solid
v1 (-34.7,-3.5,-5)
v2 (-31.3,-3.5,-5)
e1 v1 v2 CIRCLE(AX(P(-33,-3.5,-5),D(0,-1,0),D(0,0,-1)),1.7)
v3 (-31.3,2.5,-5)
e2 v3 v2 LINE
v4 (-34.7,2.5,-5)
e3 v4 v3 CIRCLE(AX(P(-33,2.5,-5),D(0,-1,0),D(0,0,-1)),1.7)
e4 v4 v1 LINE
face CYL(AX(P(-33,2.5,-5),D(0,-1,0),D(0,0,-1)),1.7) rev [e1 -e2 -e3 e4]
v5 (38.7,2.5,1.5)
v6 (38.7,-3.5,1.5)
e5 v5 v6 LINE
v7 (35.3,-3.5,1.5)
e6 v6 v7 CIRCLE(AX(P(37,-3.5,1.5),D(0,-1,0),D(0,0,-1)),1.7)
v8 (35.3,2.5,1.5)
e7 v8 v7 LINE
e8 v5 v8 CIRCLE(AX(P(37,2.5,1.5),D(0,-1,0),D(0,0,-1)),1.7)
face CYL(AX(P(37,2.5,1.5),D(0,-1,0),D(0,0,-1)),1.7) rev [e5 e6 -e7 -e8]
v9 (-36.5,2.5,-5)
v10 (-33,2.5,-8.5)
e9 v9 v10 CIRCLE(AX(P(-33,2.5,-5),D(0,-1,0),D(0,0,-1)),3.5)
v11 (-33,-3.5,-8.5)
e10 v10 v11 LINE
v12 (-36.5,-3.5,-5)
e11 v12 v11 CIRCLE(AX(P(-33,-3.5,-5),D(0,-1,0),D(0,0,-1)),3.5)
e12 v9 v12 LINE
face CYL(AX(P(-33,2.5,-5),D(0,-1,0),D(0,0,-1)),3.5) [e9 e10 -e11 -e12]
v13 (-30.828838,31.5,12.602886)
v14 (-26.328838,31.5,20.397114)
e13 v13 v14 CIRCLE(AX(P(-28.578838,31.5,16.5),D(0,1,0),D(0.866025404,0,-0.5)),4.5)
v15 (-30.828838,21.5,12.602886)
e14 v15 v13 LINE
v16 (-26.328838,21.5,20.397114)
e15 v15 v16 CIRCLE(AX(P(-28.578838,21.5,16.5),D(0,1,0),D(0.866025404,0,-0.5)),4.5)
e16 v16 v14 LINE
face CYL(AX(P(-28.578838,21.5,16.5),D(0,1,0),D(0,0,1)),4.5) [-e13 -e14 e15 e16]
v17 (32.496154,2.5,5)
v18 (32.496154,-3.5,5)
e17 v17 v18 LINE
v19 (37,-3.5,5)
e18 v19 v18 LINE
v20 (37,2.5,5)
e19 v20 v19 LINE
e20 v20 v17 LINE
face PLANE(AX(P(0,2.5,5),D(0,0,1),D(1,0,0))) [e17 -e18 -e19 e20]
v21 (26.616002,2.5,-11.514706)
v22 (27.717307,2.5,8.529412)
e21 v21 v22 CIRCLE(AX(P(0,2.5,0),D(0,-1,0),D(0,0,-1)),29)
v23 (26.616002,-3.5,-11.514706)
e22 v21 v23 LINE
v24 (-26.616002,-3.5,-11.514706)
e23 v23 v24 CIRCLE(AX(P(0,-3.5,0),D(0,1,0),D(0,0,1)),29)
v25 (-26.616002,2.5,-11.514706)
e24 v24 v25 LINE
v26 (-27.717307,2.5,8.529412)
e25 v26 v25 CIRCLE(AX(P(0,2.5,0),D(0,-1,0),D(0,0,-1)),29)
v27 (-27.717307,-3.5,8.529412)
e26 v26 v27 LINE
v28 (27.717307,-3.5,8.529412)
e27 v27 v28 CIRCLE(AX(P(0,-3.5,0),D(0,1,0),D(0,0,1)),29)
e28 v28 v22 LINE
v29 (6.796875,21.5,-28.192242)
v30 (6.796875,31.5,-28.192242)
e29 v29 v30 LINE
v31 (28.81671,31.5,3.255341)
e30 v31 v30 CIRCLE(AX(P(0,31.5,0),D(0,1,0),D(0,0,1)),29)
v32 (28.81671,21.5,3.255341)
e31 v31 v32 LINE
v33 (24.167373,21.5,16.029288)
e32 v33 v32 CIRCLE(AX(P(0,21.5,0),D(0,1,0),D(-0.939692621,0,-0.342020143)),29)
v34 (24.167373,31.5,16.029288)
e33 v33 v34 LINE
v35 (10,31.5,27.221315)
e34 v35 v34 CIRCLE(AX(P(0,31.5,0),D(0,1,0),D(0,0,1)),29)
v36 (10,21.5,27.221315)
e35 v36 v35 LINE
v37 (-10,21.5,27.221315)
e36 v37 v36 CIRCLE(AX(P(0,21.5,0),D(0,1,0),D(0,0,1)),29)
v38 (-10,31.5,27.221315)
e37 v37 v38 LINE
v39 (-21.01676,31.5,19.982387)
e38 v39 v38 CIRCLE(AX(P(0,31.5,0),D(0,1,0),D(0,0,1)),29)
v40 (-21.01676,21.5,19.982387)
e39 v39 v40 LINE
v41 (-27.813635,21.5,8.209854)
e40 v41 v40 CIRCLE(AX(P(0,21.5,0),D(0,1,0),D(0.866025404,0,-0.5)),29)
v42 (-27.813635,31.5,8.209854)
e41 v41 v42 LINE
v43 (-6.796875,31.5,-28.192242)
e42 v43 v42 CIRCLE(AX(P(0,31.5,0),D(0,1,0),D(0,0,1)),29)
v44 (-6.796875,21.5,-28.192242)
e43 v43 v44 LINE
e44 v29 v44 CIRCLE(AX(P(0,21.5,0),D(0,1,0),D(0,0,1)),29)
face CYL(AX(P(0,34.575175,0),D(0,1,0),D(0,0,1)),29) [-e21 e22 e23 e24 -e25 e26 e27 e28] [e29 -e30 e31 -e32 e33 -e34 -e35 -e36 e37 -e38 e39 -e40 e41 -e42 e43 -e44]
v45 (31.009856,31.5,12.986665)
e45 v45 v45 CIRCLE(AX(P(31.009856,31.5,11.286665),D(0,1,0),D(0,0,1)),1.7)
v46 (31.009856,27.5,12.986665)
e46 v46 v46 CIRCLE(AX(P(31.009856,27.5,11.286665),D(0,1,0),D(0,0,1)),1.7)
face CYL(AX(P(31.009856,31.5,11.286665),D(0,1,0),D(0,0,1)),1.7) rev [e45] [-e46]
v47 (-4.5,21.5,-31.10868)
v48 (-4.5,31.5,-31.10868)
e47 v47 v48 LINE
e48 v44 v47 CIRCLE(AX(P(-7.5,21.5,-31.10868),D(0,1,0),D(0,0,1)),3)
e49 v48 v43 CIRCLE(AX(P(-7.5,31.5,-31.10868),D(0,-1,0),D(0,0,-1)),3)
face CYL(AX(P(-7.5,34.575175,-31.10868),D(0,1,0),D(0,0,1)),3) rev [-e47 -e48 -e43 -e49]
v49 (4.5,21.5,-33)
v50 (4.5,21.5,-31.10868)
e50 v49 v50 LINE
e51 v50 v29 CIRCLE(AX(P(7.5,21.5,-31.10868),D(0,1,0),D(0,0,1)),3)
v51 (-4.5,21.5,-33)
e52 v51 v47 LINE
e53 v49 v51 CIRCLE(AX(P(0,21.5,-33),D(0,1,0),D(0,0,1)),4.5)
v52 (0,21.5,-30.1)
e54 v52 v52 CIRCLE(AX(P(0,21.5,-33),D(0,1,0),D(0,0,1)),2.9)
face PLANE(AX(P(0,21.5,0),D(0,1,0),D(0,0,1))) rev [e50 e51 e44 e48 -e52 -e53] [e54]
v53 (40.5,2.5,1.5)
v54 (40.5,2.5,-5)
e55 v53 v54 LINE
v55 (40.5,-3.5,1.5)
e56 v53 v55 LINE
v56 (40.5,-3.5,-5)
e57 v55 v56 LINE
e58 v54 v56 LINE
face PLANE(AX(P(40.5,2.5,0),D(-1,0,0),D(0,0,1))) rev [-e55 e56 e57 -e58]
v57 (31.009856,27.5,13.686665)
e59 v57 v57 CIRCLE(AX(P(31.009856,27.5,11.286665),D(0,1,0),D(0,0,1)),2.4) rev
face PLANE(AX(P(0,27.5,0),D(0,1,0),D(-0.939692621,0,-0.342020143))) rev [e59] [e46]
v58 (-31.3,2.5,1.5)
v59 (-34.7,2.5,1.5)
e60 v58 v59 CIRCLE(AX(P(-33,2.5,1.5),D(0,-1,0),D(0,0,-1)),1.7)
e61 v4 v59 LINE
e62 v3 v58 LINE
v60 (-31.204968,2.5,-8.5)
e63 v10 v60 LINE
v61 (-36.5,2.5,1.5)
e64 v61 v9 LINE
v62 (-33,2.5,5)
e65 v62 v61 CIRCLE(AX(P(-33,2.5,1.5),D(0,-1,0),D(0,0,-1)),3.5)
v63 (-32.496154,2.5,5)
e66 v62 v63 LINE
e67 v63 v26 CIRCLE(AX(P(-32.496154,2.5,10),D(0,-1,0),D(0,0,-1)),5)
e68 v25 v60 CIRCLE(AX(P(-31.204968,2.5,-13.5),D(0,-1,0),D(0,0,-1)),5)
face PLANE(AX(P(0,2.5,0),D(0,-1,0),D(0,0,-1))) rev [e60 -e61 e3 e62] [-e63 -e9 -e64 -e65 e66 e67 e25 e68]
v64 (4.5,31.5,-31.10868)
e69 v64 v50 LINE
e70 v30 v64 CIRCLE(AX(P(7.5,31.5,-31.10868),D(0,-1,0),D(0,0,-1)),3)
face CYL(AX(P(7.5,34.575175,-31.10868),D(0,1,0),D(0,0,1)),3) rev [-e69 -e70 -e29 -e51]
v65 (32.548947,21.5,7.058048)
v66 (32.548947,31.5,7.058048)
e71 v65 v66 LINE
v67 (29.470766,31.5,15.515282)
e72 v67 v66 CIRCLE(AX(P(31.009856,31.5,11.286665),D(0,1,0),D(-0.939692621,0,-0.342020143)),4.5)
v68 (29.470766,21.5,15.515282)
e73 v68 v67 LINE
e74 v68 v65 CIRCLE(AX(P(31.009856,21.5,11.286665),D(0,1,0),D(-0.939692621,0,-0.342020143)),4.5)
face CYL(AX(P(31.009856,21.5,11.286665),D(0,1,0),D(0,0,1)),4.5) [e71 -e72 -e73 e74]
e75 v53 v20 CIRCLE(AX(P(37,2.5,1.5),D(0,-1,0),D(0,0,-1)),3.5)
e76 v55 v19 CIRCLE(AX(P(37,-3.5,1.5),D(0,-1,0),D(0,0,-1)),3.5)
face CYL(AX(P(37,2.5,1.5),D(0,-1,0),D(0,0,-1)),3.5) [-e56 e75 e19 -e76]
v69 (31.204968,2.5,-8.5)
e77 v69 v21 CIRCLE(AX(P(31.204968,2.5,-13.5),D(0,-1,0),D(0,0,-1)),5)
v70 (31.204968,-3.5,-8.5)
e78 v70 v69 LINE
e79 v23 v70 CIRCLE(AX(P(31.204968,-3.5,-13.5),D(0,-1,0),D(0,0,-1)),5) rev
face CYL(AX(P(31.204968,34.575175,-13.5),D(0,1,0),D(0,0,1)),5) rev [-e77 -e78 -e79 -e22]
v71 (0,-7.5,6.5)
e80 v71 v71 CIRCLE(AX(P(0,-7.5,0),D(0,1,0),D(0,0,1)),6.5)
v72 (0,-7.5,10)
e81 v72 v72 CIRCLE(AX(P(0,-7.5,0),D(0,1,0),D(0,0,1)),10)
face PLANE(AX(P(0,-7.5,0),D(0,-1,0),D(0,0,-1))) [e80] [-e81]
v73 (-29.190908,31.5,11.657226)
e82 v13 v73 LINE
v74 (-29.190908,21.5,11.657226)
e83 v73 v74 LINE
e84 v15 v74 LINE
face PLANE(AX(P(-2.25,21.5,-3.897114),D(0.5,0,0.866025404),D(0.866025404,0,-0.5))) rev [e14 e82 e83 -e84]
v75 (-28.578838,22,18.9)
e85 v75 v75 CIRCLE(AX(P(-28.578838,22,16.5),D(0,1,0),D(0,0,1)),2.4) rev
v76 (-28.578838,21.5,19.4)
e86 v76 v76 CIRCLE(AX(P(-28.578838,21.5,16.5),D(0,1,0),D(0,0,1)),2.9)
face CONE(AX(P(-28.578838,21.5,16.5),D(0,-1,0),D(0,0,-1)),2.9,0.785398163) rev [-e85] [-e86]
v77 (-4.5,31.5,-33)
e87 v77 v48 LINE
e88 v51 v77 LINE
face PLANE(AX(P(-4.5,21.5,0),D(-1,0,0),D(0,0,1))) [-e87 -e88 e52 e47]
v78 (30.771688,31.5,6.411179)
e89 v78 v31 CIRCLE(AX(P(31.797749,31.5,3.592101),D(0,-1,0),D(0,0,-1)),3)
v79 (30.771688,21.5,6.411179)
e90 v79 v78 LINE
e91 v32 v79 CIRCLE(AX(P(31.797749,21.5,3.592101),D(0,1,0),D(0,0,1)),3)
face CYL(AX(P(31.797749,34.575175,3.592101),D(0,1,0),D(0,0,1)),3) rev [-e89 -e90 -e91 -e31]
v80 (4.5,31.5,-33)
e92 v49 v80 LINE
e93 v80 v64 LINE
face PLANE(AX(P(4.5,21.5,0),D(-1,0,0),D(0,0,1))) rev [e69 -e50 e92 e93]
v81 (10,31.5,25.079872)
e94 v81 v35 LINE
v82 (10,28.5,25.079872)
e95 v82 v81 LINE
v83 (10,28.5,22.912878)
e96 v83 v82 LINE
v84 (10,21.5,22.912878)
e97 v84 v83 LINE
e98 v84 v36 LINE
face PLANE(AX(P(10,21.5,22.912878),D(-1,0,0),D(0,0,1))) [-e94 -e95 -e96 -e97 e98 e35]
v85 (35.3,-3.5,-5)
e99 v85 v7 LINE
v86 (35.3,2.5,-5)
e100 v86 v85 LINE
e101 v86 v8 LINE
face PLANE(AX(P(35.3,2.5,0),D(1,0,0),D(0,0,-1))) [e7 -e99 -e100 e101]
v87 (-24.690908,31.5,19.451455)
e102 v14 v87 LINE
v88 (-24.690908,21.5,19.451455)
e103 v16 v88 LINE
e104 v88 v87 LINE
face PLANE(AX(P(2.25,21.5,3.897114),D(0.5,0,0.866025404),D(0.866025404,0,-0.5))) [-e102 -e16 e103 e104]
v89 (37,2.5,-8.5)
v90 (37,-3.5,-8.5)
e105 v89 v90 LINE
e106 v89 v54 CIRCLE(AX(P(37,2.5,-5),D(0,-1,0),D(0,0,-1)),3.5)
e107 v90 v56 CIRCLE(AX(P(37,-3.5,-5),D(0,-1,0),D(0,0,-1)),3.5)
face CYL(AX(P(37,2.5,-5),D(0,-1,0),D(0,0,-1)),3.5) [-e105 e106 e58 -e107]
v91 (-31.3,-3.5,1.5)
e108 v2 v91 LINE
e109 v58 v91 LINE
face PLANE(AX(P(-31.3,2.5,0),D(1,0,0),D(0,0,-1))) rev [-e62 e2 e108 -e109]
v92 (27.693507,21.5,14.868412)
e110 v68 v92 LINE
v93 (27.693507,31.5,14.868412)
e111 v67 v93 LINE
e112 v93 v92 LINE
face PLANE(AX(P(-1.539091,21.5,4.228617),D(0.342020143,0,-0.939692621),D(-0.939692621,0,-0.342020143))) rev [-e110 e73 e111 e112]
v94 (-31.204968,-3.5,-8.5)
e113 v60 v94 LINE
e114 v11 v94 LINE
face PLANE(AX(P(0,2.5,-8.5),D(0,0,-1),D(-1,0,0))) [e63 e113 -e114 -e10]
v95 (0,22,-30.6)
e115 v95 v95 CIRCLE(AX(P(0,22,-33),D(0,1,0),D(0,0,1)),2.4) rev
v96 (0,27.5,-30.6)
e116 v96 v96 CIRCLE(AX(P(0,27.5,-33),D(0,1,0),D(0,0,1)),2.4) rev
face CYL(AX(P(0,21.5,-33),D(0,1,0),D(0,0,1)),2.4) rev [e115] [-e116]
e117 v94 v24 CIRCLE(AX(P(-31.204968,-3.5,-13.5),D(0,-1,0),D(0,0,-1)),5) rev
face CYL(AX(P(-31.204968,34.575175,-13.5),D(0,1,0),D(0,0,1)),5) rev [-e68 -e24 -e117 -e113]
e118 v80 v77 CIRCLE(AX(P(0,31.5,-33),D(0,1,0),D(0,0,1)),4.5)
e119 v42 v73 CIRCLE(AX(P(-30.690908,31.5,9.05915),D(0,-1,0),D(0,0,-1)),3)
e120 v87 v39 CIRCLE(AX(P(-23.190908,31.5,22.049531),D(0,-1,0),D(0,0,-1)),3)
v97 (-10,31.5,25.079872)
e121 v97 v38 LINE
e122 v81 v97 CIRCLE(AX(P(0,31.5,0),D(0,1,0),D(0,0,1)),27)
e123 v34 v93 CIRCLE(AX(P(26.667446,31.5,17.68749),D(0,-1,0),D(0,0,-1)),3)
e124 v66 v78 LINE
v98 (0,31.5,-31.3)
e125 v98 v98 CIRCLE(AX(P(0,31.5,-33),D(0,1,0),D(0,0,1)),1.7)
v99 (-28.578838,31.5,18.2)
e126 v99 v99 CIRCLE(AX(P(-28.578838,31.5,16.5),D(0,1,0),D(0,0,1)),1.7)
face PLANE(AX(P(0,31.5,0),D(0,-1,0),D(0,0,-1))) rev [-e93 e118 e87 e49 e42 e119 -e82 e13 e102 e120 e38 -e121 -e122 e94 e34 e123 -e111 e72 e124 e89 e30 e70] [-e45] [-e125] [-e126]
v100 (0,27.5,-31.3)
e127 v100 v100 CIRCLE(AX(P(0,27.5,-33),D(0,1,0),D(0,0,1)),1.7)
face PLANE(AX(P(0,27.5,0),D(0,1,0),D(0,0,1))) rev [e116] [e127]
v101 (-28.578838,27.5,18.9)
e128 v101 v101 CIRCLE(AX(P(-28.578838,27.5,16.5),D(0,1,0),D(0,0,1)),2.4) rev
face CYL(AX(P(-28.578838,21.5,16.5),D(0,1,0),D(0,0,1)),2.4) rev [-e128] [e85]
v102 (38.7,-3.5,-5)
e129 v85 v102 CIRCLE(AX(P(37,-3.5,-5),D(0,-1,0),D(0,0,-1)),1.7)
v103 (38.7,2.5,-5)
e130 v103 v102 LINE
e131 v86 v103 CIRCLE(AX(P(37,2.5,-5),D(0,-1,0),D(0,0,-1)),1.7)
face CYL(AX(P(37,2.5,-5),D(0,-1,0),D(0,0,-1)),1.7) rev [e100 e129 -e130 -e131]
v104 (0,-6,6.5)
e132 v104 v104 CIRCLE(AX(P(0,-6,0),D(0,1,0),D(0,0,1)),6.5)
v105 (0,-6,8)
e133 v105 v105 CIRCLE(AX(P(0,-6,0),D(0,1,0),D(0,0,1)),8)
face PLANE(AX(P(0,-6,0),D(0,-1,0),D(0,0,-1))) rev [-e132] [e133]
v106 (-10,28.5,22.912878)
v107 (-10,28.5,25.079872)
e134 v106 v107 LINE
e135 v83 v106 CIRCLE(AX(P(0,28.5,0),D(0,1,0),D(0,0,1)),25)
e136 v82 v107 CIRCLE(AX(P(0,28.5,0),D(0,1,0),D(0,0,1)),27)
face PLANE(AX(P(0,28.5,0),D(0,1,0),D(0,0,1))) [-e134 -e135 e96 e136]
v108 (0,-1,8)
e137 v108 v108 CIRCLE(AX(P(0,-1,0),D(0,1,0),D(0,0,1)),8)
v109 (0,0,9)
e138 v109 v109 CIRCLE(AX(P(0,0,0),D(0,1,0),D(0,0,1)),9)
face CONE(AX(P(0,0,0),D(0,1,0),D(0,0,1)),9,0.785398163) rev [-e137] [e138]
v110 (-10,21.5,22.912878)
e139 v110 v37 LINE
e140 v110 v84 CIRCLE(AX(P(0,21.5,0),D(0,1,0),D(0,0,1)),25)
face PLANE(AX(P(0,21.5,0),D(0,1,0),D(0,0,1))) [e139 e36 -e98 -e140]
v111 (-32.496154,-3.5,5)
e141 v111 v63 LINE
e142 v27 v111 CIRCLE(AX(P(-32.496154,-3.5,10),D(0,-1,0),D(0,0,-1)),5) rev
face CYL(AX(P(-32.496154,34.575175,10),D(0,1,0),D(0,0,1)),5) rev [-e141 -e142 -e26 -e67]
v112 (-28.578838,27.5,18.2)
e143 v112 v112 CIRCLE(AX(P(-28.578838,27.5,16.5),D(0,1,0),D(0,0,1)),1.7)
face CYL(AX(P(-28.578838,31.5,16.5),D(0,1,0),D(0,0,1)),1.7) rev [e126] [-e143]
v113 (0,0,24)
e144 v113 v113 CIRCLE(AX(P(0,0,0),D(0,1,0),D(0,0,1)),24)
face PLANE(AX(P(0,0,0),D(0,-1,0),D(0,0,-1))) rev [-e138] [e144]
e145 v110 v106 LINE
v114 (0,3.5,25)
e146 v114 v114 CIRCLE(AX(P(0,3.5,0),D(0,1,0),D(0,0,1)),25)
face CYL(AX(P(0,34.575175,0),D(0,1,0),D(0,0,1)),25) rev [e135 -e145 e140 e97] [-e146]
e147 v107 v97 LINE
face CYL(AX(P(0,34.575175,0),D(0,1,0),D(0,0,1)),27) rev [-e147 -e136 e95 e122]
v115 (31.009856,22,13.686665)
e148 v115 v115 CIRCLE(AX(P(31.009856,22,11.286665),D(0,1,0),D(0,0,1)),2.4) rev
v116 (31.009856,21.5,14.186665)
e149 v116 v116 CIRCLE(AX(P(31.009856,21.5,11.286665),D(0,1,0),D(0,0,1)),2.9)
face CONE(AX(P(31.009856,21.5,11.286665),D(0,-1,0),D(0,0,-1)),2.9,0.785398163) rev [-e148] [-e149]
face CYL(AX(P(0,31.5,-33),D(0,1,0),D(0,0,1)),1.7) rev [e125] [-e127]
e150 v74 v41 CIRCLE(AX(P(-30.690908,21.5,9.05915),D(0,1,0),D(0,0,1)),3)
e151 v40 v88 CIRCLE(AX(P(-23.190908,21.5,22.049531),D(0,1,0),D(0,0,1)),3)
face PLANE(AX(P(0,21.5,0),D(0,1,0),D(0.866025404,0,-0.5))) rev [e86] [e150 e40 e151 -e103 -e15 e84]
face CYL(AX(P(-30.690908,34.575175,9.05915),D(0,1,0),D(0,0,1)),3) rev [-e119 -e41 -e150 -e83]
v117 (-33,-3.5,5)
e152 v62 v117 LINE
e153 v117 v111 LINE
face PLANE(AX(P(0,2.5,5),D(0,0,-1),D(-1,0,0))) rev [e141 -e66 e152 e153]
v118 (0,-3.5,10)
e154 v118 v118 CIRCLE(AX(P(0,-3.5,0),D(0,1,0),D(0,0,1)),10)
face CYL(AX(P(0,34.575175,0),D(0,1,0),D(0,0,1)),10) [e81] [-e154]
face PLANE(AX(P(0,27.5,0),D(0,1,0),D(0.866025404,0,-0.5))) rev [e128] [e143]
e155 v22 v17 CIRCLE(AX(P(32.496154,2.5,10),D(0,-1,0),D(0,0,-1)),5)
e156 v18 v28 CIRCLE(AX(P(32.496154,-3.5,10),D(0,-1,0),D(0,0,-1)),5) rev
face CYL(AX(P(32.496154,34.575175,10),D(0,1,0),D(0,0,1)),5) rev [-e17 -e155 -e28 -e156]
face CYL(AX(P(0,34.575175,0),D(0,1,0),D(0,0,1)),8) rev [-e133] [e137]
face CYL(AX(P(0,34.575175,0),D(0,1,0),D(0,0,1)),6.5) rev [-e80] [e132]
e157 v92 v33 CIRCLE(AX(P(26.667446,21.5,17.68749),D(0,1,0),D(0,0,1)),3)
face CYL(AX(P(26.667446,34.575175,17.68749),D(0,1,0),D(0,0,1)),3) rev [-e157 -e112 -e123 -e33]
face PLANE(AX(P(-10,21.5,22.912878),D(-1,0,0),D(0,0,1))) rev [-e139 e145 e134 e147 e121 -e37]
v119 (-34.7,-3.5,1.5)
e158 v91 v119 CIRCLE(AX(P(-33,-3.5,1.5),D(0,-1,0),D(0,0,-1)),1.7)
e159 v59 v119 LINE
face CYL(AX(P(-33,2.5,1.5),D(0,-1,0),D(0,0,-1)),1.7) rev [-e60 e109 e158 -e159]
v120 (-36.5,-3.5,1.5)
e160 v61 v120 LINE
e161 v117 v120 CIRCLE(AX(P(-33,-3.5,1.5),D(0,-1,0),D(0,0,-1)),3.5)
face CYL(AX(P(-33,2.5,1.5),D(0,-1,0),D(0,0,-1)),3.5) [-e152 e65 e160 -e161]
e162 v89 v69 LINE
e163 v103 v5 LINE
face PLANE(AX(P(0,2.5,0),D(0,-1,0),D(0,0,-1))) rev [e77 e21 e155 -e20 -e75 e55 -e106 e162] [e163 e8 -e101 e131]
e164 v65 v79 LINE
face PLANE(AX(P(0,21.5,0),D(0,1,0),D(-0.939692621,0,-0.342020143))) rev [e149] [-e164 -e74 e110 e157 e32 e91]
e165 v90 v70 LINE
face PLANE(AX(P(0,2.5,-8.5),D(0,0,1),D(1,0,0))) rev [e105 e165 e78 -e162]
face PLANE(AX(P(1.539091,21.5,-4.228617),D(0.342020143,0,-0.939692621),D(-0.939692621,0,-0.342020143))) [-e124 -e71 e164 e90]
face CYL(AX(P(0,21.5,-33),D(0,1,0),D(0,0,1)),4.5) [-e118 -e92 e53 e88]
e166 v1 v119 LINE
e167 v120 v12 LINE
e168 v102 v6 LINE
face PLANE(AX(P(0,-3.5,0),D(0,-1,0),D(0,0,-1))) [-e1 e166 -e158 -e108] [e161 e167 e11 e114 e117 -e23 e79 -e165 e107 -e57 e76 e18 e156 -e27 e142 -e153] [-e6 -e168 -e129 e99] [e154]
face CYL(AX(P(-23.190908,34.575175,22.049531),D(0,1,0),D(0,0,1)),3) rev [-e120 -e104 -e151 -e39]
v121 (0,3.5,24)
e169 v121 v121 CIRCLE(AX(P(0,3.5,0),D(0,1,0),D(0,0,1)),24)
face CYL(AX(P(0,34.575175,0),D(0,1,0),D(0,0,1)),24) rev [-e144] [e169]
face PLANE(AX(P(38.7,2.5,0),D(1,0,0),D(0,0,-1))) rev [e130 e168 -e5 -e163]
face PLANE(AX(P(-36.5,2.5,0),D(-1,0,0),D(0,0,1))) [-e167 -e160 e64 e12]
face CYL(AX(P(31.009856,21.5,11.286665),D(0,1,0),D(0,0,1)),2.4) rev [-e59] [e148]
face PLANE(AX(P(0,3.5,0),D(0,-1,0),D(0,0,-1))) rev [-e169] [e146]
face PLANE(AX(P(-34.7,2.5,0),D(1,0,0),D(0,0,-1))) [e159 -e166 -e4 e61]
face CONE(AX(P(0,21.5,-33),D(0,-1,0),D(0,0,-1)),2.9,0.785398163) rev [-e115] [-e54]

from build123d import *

# Parameters (mm, degrees)
ESQUISSE1_R                        = 2.4
BOSS_EXTRU_1_DEPTH                 = 10
ESQUISSE1_3_R                      = 2.4
BOSS_EXTRU_2_DEPTH                 = 4
CHANFREIN2_SIZE                    = 0.5
CONG_1_R                           = 3
R_P_TITION_START                   = 27.5
R_P_TITION_CIRCULAIRE1_OUTLINE_R   = 2.4
R_P_TITION_CIRCULAIRE1_DEPTH       = 4
R_P_TITION_START_2                 = 21.5
R_P_TITION_CIRCULAIRE1_2_OUTLINE_R = 2.4
R_P_TITION_CIRCULAIRE1_2_DEPTH     = 10
M3_CLEARANCE_HOLE1_D               = 3.4
ENL_V_MAT_EXTRU_2_DEPTH            = 10
BOSS_EXTRU_3_START                 = -6
BOSS_EXTRU_3_DEPTH                 = 6
CONG_3_R                           = 5


with BuildPart() as part:
    # Sketch1 → Revolve1 (revolve)
    with BuildSketch(Plane.XY, mode=Mode.PRIVATE) as revolve1_sk:
        Polygon((29, -3.5), (29, 31.5), (27, 31.5), (27, 28.5), (25, 28.5), (25, 3.5), (24, 3.5), (24, 0), (9, 0), (8, -1), (8, -6), (6.5, -6), (6.5, -7.5), (10, -7.5), (10, -3.5), align=None)
    revolve(revolve1_sk.sketch.rotate(Axis((0, 34.575175177, 0), (0, -1, 0)), 90), axis=Axis((0, 34.575175177, 0), (0, -1, 0)))

    # Esquisse1 → Boss.-Extru.1 (add)
    with BuildSketch(Plane(origin=(0, 31.5, 0), x_dir=(1, 0, 0), z_dir=(0, 1, 0))):
        with BuildLine():
            Line((4.5, 28.648734702), (4.5, 33))
            ThreePointArc((4.5, 33), (0, 37.5), (-4.5, 33))
            Line((-4.5, 33), (-4.5, 28.648734702))
            ThreePointArc((-4.5, 28.648734702), (0, 29), (4.5, 28.648734702))
        make_face()
        with Locations(Location((0, 33, 0), (0, 0, 270))):
            Circle(ESQUISSE1_R, mode=Mode.SUBTRACT)
    extrude(amount=-BOSS_EXTRU_1_DEPTH)

    # Esquisse1<3> → Boss.-Extru.2 (add)
    with BuildSketch(Plane(origin=(0, 31.5, 0), x_dir=(1, 0, 0), z_dir=(0, 1, 0))):
        with Locations(Location((0, 33, 0), (0, 0, 270))):
            Circle(ESQUISSE1_3_R)
    extrude(amount=-BOSS_EXTRU_2_DEPTH)

    # Chanfrein2
    chanfrein2_edges = [part.edges().sort_by_distance(p)[0] for p in [
        (0, 21.5, -35.4),
    ]]
    chamfer(chanfrein2_edges, length=CHANFREIN2_SIZE)

    # Congé1
    cong_1_edges = [part.edges().sort_by_distance(p)[0] for p in [
        (4.5, 26.5, -28.648734702),
        (-4.5, 26.5, -28.648734702),
    ]]
    fillet(cong_1_edges, radius=CONG_1_R)



with BuildPart() as body_2:
    # Répétition circulaire1: read off the stored shape, not the designer's step
    # Répétition circulaire1 outline → Répétition circulaire1 (new body)
    with BuildSketch(Plane(origin=(0, 0, 0), x_dir=(1, 0, 0), z_dir=(0, 1, 0)).offset(R_P_TITION_START)):
        with Locations((31.009856486, -11.28666473)):
            Circle(R_P_TITION_CIRCULAIRE1_OUTLINE_R)
        with Locations((-28.578838325, -16.5)):
            Circle(R_P_TITION_CIRCULAIRE1_OUTLINE_R)
    extrude(amount=R_P_TITION_CIRCULAIRE1_DEPTH)


with BuildPart() as part_1:
    add(part.part)

    add(body_2.part)  # R_p_tition circulaire1 2 merges body 2
    # R_p_tition circulaire1 2 outline → R_p_tition circulaire1 2 (add)
    # profile 1 of 2: a face of its own
    with BuildSketch(Plane(origin=(0, 0, 0), x_dir=(1, 0, 0), z_dir=(0, 1, 0)).offset(R_P_TITION_START_2)):
        with BuildLine():
            Line((-29.190907557, -11.657225913), (-30.828838325, -12.602885683))
            ThreePointArc((-30.828838325, -12.602885683), (-32.475952642, -18.75), (-26.328838325, -20.397114317))
            Line((-26.328838325, -20.397114317), (-24.690907557, -19.451454547))
            ThreePointArc((-24.690907557, -19.451454547), (-22.761849141, -19.080371134), (-21.016759974, -19.98238725))
            ThreePointArc((-21.016759974, -19.98238725), (-25.11473671, -14.5), (-27.813634974, -8.209854417))
            ThreePointArc((-27.813634974, -8.209854417), (-27.905010686, -10.172154026), (-29.190907557, -11.657225913))
        make_face()
        with Locations((-28.578838325, -16.5)):
            Circle(R_P_TITION_CIRCULAIRE1_2_OUTLINE_R, mode=Mode.SUBTRACT)
    # profile 2 of 2: a face of its own
    with BuildSketch(Plane(origin=(0, 0, 0), x_dir=(1, 0, 0), z_dir=(0, 1, 0)).offset(R_P_TITION_START_2)):
        with BuildLine():
            ThreePointArc((30.771688116, -6.411178556), (29.247446881, -5.171961896), (28.81670962, -3.255341254))
            ThreePointArc((28.81670962, -3.255341254), (27.251086003, -9.918584157), (24.167373297, -16.029287818))
            ThreePointArc((24.167373297, -16.029287818), (25.729317183, -14.8379438), (27.693506826, -14.868412143))
            Line((27.693506826, -14.868412143), (29.470765841, -15.515281523))
            ThreePointArc((29.470765841, -15.515281523), (35.238473279, -12.825755374), (32.548947131, -7.058047936))
            Line((32.548947131, -7.058047936), (30.771688116, -6.411178556))
        make_face()
        with Locations((31.009856486, -11.28666473)):
            Circle(R_P_TITION_CIRCULAIRE1_2_OUTLINE_R, mode=Mode.SUBTRACT)
    extrude(amount=R_P_TITION_CIRCULAIRE1_2_DEPTH)

    # R_p_tition circulaire1 3: loft between two sections, ruled curve by curve
    r_p_tition_circulaire1_3_from = [
        Edge.make_three_point_arc((-28.578838325, 22, 18.9), (-30.978838325, 22, 16.5), (-28.578838325, 22, 14.1)),
        Edge.make_three_point_arc((-28.578838325, 22, 14.1), (-26.178838325, 22, 16.5), (-28.578838325, 22, 18.9)),
    ]
    r_p_tition_circulaire1_3_to = [
        Edge.make_three_point_arc((-28.578838325, 21.5, 19.4), (-31.478838325, 21.5, 16.5), (-28.578838325, 21.5, 13.6)),
        Edge.make_three_point_arc((-28.578838325, 21.5, 13.6), (-25.678838325, 21.5, 16.5), (-28.578838325, 21.5, 19.4)),
    ]
    r_p_tition_circulaire1_3 = Solid(Shell([*[Face.make_surface_from_curves(r_p_tition_circulaire1_3_from[k], r_p_tition_circulaire1_3_to[k]) for k in range(2)], Face(Wire(r_p_tition_circulaire1_3_from)), Face(Wire(r_p_tition_circulaire1_3_to))]))
    add(r_p_tition_circulaire1_3, mode=Mode.SUBTRACT)

    # R_p_tition circulaire1 4: loft between two sections, ruled curve by curve
    r_p_tition_circulaire1_4_from = [
        Edge.make_three_point_arc((31.009856486, 22, 13.68666473), (28.609856486, 22, 11.28666473), (31.009856486, 22, 8.88666473)),
        Edge.make_three_point_arc((31.009856486, 22, 8.88666473), (33.409856486, 22, 11.28666473), (31.009856486, 22, 13.68666473)),
    ]
    r_p_tition_circulaire1_4_to = [
        Edge.make_three_point_arc((31.009856486, 21.5, 14.18666473), (28.109856486, 21.5, 11.28666473), (31.009856486, 21.5, 8.38666473)),
        Edge.make_three_point_arc((31.009856486, 21.5, 8.38666473), (33.909856486, 21.5, 11.28666473), (31.009856486, 21.5, 14.18666473)),
    ]
    r_p_tition_circulaire1_4 = Solid(Shell([*[Face.make_surface_from_curves(r_p_tition_circulaire1_4_from[k], r_p_tition_circulaire1_4_to[k]) for k in range(2)], Face(Wire(r_p_tition_circulaire1_4_from)), Face(Wire(r_p_tition_circulaire1_4_to))]))
    add(r_p_tition_circulaire1_4, mode=Mode.SUBTRACT)

    # M3 Clearance Hole1 (through all)
    with Locations(Plane(origin=(0, 31.5, 0), x_dir=(1, 0, 0), z_dir=(0, 1, 0))):
        with Locations((0, 33), (-28.578838325, -16.5), (31.009856486, -11.28666473)):
            Hole(M3_CLEARANCE_HOLE1_D / 2)

    # Esquisse5 → Enlèv. mat.-Extru.2 (cut)
    with BuildSketch(Plane(origin=(0, 31.5, 0), x_dir=(1, 0, 0), z_dir=(0, 1, 0))):
        with BuildLine():
            Line((-10, -22.912878475), (-10, -27.221315178))
            ThreePointArc((-10, -27.221315178), (0, -29), (10, -27.221315178))
            Line((10, -27.221315178), (10, -22.912878475))
            ThreePointArc((10, -22.912878475), (0, -25), (-10, -22.912878475))
        make_face()
    extrude(amount=-ENL_V_MAT_EXTRU_2_DEPTH, mode=Mode.SUBTRACT)

    # Esquisse6 → Boss.-Extru.3 (add)
    # profile 1 of 4: a face of its own
    with BuildSketch(Plane.XZ.offset(3.5).offset(BOSS_EXTRU_3_START)):
        with BuildLine():
            Line((37, 5), (28.565713714, 5))
            ThreePointArc((28.565713714, 5), (28.891224426, 2.50941251), (29, 0))
            ThreePointArc((29, 0), (28.679817788, -4.297447108), (27.726341266, -8.5))
            Line((27.726341266, -8.5), (37, -8.5))
            ThreePointArc((37, -8.5), (34.525126266, -7.474873734), (33.5, -5))
            Line((33.5, -5), (33.5, 1.5))
            ThreePointArc((33.5, 1.5), (34.525126266, 3.974873734), (37, 5))
        make_face()
    # profile 2 of 4: a face of its own
    with BuildSketch(Plane.XZ.offset(3.5).offset(BOSS_EXTRU_3_START)):
        with BuildLine():
            ThreePointArc((33.5, -5), (37, -8.5), (40.5, -5))
            Line((40.5, -5), (40.5, 1.5))
            ThreePointArc((40.5, 1.5), (37, 5), (33.5, 1.5))
            Line((33.5, 1.5), (33.5, -5))
        make_face()
        with BuildLine():
            ThreePointArc((38.7, 1.5), (37, 3.2), (35.3, 1.5))
            Line((35.3, 1.5), (35.3, -5))
            ThreePointArc((35.3, -5), (37, -6.7), (38.7, -5))
            Line((38.7, -5), (38.7, 1.5))
        make_face(mode=Mode.SUBTRACT)
    # profile 3 of 4: a face of its own
    with BuildSketch(Plane.XZ.offset(3.5).offset(BOSS_EXTRU_3_START)):
        with BuildLine():
            ThreePointArc((-33, 5), (-30.525126266, 3.974873734), (-29.5, 1.5))
            Line((-29.5, 1.5), (-29.5, -5))
            ThreePointArc((-29.5, -5), (-30.525126266, -7.474873734), (-33, -8.5))
            Line((-33, -8.5), (-27.726341266, -8.5))
            ThreePointArc((-27.726341266, -8.5), (-28.944107578, -1.799621218), (-28.565713714, 5))
            Line((-28.565713714, 5), (-33, 5))
        make_face()
    # profile 4 of 4: a face of its own
    with BuildSketch(Plane.XZ.offset(3.5).offset(BOSS_EXTRU_3_START)):
        with BuildLine():
            ThreePointArc((-36.5, -5), (-33, -8.5), (-29.5, -5))
            Line((-29.5, -5), (-29.5, 1.5))
            ThreePointArc((-29.5, 1.5), (-33, 5), (-36.5, 1.5))
            Line((-36.5, 1.5), (-36.5, -5))
        make_face()
        with BuildLine():
            ThreePointArc((-31.3, 1.5), (-33, 3.2), (-34.7, 1.5))
            Line((-34.7, 1.5), (-34.7, -5))
            ThreePointArc((-34.7, -5), (-33, -6.7), (-31.3, -5))
            Line((-31.3, -5), (-31.3, 1.5))
        make_face(mode=Mode.SUBTRACT)
    extrude(amount=BOSS_EXTRU_3_DEPTH)

    # Congé3
    cong_3_edges = [part_1.edges().sort_by_distance(p)[0] for p in [
        (27.726341266, -0.5, -8.5),
        (28.565713714, -0.5, 5),
        (-28.565713714, -0.5, 5),
        (-27.726341266, -0.5, -8.5),
    ]]
    fillet(cong_3_edges, radius=CONG_3_R)


solid = part_1.part
